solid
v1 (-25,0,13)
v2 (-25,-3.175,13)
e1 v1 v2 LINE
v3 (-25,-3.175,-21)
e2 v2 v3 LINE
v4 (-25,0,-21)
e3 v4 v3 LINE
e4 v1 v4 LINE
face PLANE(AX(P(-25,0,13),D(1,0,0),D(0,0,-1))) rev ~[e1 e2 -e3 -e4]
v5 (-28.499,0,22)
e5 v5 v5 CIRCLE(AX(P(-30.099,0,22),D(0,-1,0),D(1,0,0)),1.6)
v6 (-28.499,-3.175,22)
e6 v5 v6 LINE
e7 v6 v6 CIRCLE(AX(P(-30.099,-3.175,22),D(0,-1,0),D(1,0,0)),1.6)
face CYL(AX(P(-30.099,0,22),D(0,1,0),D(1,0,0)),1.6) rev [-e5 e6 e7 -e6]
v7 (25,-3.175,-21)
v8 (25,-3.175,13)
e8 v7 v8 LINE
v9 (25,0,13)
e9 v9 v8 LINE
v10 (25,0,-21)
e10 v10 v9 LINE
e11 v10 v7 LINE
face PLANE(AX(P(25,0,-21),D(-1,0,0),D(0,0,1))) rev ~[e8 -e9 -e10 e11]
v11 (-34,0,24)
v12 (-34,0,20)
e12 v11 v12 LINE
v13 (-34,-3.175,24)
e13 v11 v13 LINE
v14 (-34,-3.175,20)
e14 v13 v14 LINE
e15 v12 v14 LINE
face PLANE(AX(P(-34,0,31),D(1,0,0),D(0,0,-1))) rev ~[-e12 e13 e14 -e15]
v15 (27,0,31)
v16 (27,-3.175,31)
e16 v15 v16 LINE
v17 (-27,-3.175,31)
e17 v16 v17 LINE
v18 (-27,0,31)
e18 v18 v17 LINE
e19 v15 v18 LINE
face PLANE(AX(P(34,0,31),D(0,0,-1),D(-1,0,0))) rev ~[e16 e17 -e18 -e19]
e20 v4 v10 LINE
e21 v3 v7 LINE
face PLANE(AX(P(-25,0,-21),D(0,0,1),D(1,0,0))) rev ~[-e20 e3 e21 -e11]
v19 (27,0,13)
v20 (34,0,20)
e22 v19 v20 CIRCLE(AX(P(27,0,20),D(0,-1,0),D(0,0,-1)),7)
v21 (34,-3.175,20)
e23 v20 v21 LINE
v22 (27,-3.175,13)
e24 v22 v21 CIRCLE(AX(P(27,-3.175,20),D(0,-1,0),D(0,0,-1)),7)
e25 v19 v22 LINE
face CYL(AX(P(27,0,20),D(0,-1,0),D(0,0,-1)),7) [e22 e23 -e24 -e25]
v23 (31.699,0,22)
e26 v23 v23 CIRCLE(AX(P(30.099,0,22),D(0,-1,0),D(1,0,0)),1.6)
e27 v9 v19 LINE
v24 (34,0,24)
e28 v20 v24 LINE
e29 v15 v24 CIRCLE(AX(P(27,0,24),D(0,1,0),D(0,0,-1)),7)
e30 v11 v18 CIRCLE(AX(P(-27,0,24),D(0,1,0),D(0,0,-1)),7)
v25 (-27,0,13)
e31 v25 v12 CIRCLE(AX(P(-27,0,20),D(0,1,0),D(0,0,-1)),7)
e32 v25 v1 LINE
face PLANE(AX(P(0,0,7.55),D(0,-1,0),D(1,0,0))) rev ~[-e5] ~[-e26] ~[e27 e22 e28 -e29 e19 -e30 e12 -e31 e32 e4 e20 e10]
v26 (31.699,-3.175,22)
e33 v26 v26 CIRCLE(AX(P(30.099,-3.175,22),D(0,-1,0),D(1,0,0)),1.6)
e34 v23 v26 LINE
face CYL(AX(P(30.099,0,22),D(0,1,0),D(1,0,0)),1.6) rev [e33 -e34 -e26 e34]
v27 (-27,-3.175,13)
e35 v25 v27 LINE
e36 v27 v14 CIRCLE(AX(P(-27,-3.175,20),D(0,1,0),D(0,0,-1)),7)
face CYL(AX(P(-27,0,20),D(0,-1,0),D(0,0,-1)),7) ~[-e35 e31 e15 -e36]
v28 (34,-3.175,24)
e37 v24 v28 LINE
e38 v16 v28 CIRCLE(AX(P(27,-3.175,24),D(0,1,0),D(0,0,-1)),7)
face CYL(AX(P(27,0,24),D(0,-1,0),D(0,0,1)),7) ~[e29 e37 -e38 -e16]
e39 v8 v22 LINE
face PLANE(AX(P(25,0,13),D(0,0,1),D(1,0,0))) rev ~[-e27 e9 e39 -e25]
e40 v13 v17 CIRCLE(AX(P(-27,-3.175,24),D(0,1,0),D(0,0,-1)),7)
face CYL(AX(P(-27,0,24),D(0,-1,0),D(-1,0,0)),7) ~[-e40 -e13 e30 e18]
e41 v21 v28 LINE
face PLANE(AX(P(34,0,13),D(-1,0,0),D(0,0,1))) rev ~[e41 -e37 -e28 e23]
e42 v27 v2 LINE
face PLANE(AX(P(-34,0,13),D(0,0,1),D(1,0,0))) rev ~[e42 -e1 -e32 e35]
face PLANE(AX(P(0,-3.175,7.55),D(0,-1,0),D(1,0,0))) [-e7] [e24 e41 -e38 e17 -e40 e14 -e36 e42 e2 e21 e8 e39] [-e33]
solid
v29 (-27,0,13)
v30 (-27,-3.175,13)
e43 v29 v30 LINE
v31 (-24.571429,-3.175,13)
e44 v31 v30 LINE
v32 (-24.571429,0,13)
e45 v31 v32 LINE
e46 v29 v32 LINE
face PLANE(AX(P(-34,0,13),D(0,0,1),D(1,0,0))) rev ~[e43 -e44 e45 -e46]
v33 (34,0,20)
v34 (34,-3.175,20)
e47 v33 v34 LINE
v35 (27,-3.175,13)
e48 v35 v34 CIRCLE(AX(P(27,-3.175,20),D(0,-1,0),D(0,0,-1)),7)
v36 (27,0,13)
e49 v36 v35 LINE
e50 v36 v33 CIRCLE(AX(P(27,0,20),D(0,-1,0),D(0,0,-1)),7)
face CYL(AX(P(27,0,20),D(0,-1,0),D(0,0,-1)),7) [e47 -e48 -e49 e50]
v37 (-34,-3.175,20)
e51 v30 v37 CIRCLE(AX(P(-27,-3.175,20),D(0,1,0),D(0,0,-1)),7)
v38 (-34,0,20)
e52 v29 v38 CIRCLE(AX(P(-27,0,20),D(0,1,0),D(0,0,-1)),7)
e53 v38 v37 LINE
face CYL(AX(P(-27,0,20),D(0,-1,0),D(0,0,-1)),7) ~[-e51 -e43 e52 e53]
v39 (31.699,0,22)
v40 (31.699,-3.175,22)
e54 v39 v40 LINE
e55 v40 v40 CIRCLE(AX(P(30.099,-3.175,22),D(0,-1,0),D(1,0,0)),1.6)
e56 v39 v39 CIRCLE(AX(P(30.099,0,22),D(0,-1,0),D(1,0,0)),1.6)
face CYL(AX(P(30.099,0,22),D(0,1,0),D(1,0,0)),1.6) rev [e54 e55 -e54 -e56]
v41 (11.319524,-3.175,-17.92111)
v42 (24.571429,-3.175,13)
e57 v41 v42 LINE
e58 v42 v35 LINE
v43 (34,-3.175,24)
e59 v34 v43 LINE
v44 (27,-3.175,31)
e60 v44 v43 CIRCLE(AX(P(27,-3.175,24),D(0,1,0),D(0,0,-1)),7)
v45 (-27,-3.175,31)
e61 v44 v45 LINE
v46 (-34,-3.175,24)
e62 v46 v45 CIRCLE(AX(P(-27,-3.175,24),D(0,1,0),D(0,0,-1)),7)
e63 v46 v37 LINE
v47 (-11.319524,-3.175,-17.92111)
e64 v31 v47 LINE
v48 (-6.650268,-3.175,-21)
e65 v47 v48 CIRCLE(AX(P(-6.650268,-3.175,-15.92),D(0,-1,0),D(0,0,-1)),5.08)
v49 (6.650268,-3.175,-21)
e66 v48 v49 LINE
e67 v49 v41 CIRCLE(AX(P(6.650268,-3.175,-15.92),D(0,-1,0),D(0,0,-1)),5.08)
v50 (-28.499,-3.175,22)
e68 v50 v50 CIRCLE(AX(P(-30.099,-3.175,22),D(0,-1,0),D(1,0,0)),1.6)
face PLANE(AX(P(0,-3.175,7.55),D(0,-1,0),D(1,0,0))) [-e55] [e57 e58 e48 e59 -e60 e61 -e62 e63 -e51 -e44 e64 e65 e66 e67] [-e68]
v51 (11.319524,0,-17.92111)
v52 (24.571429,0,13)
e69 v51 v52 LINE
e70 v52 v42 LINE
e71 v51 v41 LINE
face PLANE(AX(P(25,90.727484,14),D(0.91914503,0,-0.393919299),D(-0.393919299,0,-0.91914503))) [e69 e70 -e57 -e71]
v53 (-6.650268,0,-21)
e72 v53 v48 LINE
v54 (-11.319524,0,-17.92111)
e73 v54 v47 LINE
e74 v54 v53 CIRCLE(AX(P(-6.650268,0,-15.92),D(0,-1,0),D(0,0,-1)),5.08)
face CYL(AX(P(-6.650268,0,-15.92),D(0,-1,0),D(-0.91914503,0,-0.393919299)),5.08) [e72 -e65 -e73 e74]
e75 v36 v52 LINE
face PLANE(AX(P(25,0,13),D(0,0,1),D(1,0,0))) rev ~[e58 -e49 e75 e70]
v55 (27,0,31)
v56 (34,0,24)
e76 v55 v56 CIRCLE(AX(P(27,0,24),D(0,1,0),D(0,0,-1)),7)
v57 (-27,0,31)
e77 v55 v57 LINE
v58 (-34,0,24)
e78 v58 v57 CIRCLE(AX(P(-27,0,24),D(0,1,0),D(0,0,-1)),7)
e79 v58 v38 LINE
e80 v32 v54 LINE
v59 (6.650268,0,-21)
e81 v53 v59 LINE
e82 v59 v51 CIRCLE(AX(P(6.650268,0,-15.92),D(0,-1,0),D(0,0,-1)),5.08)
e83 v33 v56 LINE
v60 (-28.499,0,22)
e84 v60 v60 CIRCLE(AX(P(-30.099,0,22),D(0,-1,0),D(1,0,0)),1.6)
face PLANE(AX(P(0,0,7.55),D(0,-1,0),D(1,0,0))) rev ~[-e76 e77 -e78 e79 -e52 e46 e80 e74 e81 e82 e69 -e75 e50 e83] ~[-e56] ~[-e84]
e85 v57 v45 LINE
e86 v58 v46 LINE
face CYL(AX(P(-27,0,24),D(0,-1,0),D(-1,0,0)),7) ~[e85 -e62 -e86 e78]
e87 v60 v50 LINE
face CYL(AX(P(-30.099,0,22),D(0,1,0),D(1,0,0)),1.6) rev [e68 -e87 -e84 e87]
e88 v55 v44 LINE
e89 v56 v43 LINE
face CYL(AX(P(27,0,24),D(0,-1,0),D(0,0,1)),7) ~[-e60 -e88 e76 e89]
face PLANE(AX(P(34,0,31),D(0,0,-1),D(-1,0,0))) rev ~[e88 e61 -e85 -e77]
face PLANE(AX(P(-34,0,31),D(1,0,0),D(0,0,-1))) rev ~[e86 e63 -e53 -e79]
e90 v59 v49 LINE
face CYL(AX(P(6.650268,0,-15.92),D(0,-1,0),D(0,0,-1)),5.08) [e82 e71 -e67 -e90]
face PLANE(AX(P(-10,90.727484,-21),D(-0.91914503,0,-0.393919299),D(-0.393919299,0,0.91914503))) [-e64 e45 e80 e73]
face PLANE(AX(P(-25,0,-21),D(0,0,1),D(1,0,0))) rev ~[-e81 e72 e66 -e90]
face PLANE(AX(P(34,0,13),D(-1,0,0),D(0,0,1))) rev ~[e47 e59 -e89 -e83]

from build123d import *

# Parameters (mm, degrees)
F0_R        = 1.6
F1_DEPTH    = 3.175
F2_R        = 7
F4_T4_DEPTH = 184.6299677566
F4_T9_DEPTH = 184.6299677566
F5_R        = 5.08


# Not quite as in the source:
# - a fillet or chamfer that OpenCascade refuses, or shapes differently, is made with other operations: its cross-section is extruded or revolved along the edge and cut away or added


with BuildPart() as f1:
    # F0 (on Front) → F1 (new body)
    with BuildSketch(Plane.XZ):
        Polygon((-25, 13), (-25, -21), (25, -21), (25, 13), (34, 13), (34, 22), (34, 31), (0, 31), (-34, 31), (-34, 24), (-34, 13), align=None)
        with Locations((-30.099, 22)):
            Circle(F0_R, mode=Mode.SUBTRACT)
        with Locations((30.099, 22)):
            Circle(F0_R, mode=Mode.SUBTRACT)
    extrude(amount=F1_DEPTH)

    # F2
    f2_edges = [f1.edges().sort_by_distance(p)[0] for p in [
        (-34, -1.5875, 31),
        (-34, -1.5875, 13),
        (34, -1.5875, 31),
        (34, -1.5875, 13),
    ]]
    fillet(f2_edges, radius=F2_R)


with BuildPart() as f3_1:
    # F3: copy of F1
    add(f1.part)


with BuildPart() as f1_1:
    add(f1.part)

    # F4: chamfer of 15 x 35 on 2 edges, made by hand


with BuildPart() as f4_tool2:
    # F4_s3 → F4_t4 (new body)
    with BuildSketch(Plane.XZ.offset(-90.7274838783)):
        Polygon((-10, -21), (-25, 14), (-25, -21), align=None)
    extrude(amount=F4_T4_DEPTH)

    split(bisect_by=Plane.XY.offset(13), keep=Keep.BOTTOM)


with BuildPart() as f1_2:
    add(f1_1.part)

    # F4_t1: cut F4_tool2
    add(f4_tool2.part, mode=Mode.SUBTRACT)


with BuildPart() as f4_tool7:
    # F4_s8 → F4_t9 (new body)
    with BuildSketch(Plane.XZ.offset(-90.7274838783)):
        Polygon((25, 14), (10, -21), (25, -21), align=None)
    extrude(amount=F4_T9_DEPTH)

    split(bisect_by=Plane.XY.offset(13), keep=Keep.BOTTOM)


with BuildPart() as f1_3:
    add(f1_2.part)

    # F4_t6: cut F4_tool7
    add(f4_tool7.part, mode=Mode.SUBTRACT)

    # F5
    f5_edges = [f1_3.edges().sort_by_distance(p)[0] for p in [
        (-10, -1.5875, -21),
        (10, -1.5875, -21),
    ]]
    fillet(f5_edges, radius=F5_R)


solid = Compound([f3_1.part, f1_3.part])
